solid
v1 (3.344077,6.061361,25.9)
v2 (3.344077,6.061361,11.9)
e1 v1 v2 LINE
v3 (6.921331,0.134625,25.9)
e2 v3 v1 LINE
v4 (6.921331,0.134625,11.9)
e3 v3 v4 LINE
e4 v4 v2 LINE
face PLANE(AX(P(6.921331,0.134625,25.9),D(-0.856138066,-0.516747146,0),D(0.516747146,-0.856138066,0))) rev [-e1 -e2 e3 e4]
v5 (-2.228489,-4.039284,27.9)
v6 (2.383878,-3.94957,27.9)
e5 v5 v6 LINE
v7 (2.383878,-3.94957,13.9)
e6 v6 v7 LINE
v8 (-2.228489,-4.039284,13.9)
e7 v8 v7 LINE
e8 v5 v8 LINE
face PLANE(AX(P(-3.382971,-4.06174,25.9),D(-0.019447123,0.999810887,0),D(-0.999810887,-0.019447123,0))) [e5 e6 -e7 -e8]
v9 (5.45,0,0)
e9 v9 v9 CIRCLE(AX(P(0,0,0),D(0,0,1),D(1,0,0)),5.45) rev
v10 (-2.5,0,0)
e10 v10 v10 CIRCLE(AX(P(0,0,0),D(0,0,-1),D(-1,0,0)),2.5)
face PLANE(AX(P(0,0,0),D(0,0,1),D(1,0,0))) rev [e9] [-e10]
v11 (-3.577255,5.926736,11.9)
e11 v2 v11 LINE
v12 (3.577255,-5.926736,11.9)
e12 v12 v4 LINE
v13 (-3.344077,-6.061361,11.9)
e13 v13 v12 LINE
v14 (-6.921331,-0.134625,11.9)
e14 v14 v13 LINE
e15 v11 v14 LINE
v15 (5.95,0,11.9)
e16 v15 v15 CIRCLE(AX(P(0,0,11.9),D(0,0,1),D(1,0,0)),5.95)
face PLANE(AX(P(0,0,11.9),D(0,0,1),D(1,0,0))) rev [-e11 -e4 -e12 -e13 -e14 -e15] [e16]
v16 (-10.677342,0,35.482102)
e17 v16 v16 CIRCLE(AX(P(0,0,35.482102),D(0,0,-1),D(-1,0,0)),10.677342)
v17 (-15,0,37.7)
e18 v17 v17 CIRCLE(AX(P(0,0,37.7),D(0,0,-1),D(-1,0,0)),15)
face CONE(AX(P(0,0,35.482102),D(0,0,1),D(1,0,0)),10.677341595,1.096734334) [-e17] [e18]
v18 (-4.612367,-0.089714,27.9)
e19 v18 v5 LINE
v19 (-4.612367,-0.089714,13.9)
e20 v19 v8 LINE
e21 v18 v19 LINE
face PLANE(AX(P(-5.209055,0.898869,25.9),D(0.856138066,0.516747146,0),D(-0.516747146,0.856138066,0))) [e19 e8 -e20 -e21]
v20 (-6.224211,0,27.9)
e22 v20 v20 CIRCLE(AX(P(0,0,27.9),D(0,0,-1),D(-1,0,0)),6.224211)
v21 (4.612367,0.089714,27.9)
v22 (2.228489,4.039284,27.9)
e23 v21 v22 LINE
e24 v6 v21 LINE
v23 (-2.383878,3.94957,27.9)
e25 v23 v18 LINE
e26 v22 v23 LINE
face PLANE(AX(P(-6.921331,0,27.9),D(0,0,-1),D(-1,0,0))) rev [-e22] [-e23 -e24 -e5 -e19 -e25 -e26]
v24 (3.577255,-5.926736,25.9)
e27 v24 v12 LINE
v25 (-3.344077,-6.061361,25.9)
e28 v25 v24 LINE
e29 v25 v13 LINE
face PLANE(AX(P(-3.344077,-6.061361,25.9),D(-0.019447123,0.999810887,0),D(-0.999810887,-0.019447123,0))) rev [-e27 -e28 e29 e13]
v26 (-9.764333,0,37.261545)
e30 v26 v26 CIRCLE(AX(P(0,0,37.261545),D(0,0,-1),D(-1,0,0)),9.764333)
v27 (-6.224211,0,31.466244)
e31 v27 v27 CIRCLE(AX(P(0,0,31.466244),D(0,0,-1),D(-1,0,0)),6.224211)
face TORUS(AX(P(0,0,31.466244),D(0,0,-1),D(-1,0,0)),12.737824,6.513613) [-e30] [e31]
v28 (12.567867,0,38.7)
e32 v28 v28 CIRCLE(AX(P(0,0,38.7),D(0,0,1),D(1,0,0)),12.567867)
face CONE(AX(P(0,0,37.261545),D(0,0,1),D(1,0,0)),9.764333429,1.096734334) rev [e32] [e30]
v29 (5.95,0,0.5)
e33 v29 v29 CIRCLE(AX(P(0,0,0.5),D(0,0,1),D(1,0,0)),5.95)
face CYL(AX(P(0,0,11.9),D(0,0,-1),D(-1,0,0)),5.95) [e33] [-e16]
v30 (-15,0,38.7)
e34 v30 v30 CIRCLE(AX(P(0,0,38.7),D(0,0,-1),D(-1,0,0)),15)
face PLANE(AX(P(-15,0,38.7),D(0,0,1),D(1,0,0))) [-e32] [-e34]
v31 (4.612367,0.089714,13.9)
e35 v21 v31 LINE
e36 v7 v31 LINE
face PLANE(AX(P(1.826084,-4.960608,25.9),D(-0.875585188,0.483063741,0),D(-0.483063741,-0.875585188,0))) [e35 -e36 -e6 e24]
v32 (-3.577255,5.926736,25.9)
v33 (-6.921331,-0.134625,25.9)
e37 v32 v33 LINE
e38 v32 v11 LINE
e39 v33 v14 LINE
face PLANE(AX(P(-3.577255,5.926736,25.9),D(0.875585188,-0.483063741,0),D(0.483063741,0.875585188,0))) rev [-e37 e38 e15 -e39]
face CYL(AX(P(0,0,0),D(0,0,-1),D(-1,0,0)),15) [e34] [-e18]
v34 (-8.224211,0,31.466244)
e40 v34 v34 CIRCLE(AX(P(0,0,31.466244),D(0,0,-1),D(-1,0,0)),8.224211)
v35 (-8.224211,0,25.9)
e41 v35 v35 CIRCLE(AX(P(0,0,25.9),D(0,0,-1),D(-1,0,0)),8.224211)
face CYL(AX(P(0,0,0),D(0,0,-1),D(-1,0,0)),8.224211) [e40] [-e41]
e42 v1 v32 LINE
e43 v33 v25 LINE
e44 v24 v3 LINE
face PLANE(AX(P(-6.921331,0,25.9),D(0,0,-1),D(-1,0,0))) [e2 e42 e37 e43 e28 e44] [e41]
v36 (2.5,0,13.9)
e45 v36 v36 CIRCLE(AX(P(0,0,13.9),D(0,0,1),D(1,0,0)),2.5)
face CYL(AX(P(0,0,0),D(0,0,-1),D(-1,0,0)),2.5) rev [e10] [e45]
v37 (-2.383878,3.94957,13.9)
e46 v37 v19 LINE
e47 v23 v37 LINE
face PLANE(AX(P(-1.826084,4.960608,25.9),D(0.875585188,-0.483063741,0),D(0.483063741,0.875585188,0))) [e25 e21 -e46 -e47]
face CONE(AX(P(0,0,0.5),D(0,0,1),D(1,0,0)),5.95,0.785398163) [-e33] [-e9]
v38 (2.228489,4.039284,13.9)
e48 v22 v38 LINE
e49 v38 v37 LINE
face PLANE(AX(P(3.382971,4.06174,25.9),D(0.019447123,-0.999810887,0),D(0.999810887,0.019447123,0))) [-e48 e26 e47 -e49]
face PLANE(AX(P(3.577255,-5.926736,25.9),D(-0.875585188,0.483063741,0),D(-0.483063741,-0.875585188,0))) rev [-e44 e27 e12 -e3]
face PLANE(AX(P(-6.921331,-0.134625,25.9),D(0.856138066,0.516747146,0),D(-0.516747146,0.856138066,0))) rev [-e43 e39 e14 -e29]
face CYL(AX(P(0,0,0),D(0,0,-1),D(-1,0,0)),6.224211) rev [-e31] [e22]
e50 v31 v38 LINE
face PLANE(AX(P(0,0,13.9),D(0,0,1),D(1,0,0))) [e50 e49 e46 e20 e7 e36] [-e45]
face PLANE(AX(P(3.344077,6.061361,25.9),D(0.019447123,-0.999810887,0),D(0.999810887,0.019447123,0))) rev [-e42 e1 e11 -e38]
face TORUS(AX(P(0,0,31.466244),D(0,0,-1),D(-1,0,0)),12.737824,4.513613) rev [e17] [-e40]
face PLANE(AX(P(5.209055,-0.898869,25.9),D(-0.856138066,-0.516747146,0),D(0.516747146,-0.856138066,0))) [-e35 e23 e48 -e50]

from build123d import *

# Parameters (mm, degrees)
SKETCH1_R           = 5.95
BOSS_EXTRUDE1_DEPTH = 11.9
M6_TAPPED_HOLE1_D   = 5
BOSS_EXTRUDE2_DEPTH = 14
CHAMFER1_SIZE       = 0.5
SHELL1_START        = 13.9
SHELL1_DEPTH        = 24.8
SHELL1_START_2      = 27.9
SHELL1_2_OUTLINE_R  = 6.224211325
SHELL1_2_DEPTH      = 10.8
SKETCH6_R           = 2.5
CUT_EXTRUDE1_DEPTH  = 35.179526035


with BuildPart() as part:
    # Sketch1 → Boss-Extrude1 (new body)
    with BuildSketch(Plane.XY):
        Circle(SKETCH1_R)
    extrude(amount=BOSS_EXTRUDE1_DEPTH)

    # M6 Tapped Hole1 (through all)
    with Locations(Plane(origin=(0, 0, 0), x_dir=(-1, 0, 0), z_dir=(0, 0, -1))):
        with Locations((0, 0)):
            Hole(M6_TAPPED_HOLE1_D / 2)

    # Sketch4 → Boss-Extrude2 (add)
    with BuildSketch(Plane.XY.offset(11.9)):
        Polygon((6.921331173, 0.134625435), (3.34407654, 6.061361341), (-3.577254633, 5.926735906), (-6.921331173, -0.134625435), (-3.34407654, -6.061361341), (3.577254633, -5.926735906), align=None)
    extrude(amount=BOSS_EXTRUDE2_DEPTH)

    # Sketch5 → Revolve1 (revolve)
    with BuildSketch(Plane(origin=(0, 0, 0), x_dir=(1, 0, 0), z_dir=(0, 1, 0))):
        with BuildLine():
            Line((-6.921331173, -25.9), (-8.224211325, -25.9))
            Line((-8.224211325, -25.9), (-8.224211325, -31.466244152))
            ThreePointArc((-8.224211325, -31.466244152), (-8.886011508, -33.819165828), (-10.677341595, -35.48210191))
            Line((-10.677341595, -35.48210191), (-15, -37.7))
            Line((-15, -37.7), (-15, -38.7))
            Line((-15, -38.7), (0, -38.7))
            Line((0, -38.7), (0, -25.9))
            Line((0, -25.9), (-6.921331173, -25.9))
        make_face()
    revolve(axis=Axis((0, 0, 0), (0, 0, 1)))

    # Chamfer1
    chamfer1_edges = [part.edges().sort_by_distance(p)[0] for p in [
        (-5.95, 0, 0),
    ]]
    chamfer(chamfer1_edges, length=CHAMFER1_SIZE)

    # Shell1: read off the stored shape, not the designer's step
    # Shell1 outline → Shell1 (cut)
    with BuildSketch(Plane.XY.offset(SHELL1_START)):
        Polygon((-2.228488616, -4.039283965), (2.383878219, -3.949569736), (4.612366834, 0.089714229), (2.228488616, 4.039283965), (-2.383878219, 3.949569736), (-4.612366834, -0.089714229), align=None)
    extrude(amount=SHELL1_DEPTH, mode=Mode.SUBTRACT)

    # Shell1 2 outline → Shell1 2 (cut)
    with BuildSketch(Plane.XY.offset(SHELL1_START_2)):
        Circle(SHELL1_2_OUTLINE_R)
        Polygon((4.612366834, 0.089714229), (2.383878219, -3.949569736), (-2.228488616, -4.039283965), (-4.612366834, -0.089714229), (-2.383878219, 3.949569736), (2.228488616, 4.039283965), align=None, mode=Mode.SUBTRACT)
    extrude(amount=SHELL1_2_DEPTH, mode=Mode.SUBTRACT)

    # Shell1 3 outline → Shell1 3 (revolve, cut)
    with BuildSketch(Plane.XZ):
        with BuildLine():
            ThreePointArc((6.224211325, 31.466244152), (7.179257815, 34.861754834), (9.764333429, 37.261544544))
            Line((9.764333429, 37.261544544), (12.567866916, 38.7))
            Line((12.567866916, 38.7), (6.224211325, 38.7))
            Line((6.224211325, 38.7), (6.224211325, 31.466244152))
        make_face()
    revolve(axis=Axis((0, 0, 0), (0, 0, 1)), mode=Mode.SUBTRACT)

    # Sketch6 → Cut-Extrude1 (cut, through all)
    with BuildSketch(Plane(origin=(0, 0, 11.9), x_dir=(-1, 0, 0), z_dir=(0, 0, -1))):
        Circle(SKETCH6_R)
    extrude(amount=-CUT_EXTRUDE1_DEPTH, mode=Mode.SUBTRACT)


solid = part.part
